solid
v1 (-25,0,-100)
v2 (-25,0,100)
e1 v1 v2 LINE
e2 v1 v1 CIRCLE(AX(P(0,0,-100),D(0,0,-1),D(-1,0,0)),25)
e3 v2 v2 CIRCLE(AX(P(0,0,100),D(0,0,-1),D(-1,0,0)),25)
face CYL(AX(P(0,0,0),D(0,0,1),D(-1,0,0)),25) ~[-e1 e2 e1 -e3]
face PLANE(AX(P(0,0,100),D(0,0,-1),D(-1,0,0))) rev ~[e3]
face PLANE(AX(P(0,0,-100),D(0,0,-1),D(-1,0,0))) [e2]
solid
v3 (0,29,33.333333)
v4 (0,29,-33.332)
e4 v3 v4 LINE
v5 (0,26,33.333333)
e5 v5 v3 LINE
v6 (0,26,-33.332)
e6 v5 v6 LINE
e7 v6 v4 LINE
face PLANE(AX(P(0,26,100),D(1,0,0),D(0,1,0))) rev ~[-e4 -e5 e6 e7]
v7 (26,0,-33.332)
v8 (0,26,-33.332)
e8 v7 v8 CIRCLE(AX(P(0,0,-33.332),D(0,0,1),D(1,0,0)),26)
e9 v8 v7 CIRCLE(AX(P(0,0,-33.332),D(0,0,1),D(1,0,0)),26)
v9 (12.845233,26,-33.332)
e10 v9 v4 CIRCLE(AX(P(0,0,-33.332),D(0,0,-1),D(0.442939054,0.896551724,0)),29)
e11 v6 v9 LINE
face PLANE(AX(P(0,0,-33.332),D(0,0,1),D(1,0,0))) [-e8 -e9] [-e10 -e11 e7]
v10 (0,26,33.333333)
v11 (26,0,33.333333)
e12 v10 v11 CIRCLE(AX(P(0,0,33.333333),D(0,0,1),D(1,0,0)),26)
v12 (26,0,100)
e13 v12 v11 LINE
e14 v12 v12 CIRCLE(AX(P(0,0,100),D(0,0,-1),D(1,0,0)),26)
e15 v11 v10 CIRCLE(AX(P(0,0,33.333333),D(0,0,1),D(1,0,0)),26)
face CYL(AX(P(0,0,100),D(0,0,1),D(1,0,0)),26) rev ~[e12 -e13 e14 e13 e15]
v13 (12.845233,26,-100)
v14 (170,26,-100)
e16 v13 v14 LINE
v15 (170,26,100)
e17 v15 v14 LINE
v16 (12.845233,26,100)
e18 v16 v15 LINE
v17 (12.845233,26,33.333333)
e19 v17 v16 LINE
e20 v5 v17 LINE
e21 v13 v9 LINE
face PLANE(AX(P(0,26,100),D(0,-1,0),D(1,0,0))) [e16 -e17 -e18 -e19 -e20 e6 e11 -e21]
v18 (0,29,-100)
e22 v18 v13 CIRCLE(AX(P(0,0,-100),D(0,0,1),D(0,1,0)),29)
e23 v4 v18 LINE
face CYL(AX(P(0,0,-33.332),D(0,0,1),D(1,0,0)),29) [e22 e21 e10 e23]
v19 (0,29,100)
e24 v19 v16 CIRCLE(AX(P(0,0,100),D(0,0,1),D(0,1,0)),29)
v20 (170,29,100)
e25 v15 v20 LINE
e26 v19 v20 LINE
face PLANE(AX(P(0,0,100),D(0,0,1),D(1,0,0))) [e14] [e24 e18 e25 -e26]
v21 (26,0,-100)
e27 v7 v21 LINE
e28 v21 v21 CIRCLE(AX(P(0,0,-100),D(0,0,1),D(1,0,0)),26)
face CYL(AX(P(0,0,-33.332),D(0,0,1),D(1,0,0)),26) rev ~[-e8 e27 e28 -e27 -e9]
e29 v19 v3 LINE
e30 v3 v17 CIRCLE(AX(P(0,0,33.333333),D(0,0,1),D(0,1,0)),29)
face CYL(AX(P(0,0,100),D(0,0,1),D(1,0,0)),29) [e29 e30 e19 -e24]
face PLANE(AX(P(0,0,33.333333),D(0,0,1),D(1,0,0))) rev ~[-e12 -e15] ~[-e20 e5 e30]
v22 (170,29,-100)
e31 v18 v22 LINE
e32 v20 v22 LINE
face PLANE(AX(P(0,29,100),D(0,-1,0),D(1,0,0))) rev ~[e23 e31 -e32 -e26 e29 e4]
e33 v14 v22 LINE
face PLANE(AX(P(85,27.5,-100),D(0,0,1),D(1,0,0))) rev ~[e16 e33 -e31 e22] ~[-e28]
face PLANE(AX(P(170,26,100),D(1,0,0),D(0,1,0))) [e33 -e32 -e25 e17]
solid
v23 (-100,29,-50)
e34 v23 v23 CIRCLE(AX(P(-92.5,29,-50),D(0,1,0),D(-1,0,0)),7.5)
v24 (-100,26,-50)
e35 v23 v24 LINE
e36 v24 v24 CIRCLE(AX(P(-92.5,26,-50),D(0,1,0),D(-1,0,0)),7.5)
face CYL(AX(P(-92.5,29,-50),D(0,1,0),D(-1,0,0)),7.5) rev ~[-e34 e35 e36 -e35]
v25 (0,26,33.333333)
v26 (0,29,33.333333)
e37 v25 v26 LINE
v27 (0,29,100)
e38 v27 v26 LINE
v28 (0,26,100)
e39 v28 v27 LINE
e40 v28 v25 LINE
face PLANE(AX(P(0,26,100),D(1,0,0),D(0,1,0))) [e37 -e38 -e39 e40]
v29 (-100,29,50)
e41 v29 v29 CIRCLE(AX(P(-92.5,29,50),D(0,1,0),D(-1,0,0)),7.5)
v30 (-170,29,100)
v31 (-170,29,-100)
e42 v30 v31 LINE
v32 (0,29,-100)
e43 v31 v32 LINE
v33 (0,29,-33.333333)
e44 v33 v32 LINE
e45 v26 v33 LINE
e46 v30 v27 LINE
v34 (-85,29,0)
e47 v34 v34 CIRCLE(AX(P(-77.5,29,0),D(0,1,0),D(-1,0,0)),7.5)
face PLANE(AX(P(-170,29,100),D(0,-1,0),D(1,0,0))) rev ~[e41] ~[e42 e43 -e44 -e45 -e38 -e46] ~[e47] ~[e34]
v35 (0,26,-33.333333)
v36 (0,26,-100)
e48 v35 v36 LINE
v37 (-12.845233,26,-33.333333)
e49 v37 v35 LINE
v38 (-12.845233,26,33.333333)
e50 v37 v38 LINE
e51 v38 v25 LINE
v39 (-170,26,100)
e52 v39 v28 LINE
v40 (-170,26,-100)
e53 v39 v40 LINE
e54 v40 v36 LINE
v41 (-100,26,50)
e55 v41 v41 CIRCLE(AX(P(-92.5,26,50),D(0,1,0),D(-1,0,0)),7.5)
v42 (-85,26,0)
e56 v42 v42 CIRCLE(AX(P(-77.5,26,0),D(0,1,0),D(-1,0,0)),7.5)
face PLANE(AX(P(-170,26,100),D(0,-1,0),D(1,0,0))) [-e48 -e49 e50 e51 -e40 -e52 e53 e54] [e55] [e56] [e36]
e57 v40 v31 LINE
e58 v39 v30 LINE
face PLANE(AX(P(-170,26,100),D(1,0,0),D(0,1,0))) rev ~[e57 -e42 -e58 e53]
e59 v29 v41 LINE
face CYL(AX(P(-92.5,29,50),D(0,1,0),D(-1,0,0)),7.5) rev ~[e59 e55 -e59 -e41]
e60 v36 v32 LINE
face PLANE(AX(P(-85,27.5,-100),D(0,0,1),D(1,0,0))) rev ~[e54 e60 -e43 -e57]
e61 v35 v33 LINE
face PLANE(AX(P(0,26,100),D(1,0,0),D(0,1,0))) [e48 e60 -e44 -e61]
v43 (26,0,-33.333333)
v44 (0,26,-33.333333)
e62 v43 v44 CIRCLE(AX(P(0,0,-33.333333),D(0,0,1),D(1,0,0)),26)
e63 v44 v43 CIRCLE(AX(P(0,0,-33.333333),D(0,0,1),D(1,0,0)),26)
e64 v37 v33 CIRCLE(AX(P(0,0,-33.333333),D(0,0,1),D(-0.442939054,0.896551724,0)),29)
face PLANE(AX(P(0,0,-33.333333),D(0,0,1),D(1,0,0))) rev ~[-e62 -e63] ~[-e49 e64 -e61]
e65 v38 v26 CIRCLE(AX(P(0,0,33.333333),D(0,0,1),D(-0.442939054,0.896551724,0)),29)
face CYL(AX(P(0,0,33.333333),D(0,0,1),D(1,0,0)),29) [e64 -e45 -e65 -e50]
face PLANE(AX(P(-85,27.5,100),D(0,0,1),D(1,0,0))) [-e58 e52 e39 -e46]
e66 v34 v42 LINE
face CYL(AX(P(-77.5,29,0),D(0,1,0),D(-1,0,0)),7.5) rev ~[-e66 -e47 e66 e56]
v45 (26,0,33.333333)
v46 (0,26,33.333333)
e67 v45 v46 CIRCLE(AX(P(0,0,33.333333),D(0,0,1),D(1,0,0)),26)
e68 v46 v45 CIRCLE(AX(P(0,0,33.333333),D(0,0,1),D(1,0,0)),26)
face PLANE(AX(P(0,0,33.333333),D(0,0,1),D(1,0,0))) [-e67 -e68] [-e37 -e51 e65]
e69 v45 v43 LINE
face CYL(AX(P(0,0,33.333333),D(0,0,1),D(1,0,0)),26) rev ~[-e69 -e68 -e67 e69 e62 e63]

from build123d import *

# Parameters (mm, degrees)
F1_W      = 25
F1_H      = 200
F3_R      = 29
F3_R_2    = 26
F4_DEPTH  = 66.6666666667
F5_START  = -133.332
F5_DEPTH  = 66.668
F6_START  = -66.6666666667
F6_DEPTH  = 66.6666666667
F7_W      = 170
F7_H      = 3
F8_DEPTH  = 200
F9_W      = 170
F9_H      = 3
F10_DEPTH = 200
F11_R     = 7.5
F12_DEPTH = 25


with BuildPart() as f2:
    # F1 (on Front) → F2 (revolve)
    with BuildSketch(Plane.XZ):
        with Locations((-12.5, 0)):
            Rectangle(F1_W, F1_H)
    revolve(axis=Axis((0, 0, 0), (0, 0, -1)))


with BuildPart() as f4:
    # F3 (on face) → F4 (new body)
    with BuildSketch(Plane.XY.offset(100)):
        Circle(F3_R)
        Circle(F3_R_2, mode=Mode.SUBTRACT)
    extrude(amount=-F4_DEPTH)



with BuildPart() as f5:
    # F3 (on face) → F5 (new body)
    with BuildSketch(Plane.XY.offset(100).offset(F5_START)):
        Circle(F3_R)
        Circle(F3_R_2, mode=Mode.SUBTRACT)
    extrude(amount=-F5_DEPTH)


with BuildPart() as f6:
    # F3 (on face) → F6 (new body)
    with BuildSketch(Plane.XY.offset(100).offset(F6_START)):
        Circle(F3_R)
        Circle(F3_R_2, mode=Mode.SUBTRACT)
    extrude(amount=-F6_DEPTH)

    # F9 (on face) → F10 (join)
    with BuildSketch(Plane.XY.offset(100)):
        with Locations((-85, 27.5)):
            Rectangle(F9_W, F9_H)
    extrude(amount=-F10_DEPTH)

    # F11 (on face) → F12 (cut)
    with BuildSketch(Plane(origin=(0, 29, 0), x_dir=(-1, 0, 0), z_dir=(0, 1, 0))):
        with Locations((77.5, 0)):
            Circle(F11_R)
        with Locations((92.5, 50)):
            Circle(F11_R)
        with Locations((92.5, -50)):
            Circle(F11_R)
    extrude(amount=-F12_DEPTH, mode=Mode.SUBTRACT)


with BuildPart() as f4_1:
    add(f4.part)

    add(f5.part)  # F8 merges F5
    # F7 (on face) → F8 (join)
    with BuildSketch(Plane.XY.offset(100)):
        with Locations((85, 27.5)):
            Rectangle(F7_W, F7_H)
    extrude(amount=-F8_DEPTH)


solid = Compound([f2.part, f6.part, f4_1.part])
